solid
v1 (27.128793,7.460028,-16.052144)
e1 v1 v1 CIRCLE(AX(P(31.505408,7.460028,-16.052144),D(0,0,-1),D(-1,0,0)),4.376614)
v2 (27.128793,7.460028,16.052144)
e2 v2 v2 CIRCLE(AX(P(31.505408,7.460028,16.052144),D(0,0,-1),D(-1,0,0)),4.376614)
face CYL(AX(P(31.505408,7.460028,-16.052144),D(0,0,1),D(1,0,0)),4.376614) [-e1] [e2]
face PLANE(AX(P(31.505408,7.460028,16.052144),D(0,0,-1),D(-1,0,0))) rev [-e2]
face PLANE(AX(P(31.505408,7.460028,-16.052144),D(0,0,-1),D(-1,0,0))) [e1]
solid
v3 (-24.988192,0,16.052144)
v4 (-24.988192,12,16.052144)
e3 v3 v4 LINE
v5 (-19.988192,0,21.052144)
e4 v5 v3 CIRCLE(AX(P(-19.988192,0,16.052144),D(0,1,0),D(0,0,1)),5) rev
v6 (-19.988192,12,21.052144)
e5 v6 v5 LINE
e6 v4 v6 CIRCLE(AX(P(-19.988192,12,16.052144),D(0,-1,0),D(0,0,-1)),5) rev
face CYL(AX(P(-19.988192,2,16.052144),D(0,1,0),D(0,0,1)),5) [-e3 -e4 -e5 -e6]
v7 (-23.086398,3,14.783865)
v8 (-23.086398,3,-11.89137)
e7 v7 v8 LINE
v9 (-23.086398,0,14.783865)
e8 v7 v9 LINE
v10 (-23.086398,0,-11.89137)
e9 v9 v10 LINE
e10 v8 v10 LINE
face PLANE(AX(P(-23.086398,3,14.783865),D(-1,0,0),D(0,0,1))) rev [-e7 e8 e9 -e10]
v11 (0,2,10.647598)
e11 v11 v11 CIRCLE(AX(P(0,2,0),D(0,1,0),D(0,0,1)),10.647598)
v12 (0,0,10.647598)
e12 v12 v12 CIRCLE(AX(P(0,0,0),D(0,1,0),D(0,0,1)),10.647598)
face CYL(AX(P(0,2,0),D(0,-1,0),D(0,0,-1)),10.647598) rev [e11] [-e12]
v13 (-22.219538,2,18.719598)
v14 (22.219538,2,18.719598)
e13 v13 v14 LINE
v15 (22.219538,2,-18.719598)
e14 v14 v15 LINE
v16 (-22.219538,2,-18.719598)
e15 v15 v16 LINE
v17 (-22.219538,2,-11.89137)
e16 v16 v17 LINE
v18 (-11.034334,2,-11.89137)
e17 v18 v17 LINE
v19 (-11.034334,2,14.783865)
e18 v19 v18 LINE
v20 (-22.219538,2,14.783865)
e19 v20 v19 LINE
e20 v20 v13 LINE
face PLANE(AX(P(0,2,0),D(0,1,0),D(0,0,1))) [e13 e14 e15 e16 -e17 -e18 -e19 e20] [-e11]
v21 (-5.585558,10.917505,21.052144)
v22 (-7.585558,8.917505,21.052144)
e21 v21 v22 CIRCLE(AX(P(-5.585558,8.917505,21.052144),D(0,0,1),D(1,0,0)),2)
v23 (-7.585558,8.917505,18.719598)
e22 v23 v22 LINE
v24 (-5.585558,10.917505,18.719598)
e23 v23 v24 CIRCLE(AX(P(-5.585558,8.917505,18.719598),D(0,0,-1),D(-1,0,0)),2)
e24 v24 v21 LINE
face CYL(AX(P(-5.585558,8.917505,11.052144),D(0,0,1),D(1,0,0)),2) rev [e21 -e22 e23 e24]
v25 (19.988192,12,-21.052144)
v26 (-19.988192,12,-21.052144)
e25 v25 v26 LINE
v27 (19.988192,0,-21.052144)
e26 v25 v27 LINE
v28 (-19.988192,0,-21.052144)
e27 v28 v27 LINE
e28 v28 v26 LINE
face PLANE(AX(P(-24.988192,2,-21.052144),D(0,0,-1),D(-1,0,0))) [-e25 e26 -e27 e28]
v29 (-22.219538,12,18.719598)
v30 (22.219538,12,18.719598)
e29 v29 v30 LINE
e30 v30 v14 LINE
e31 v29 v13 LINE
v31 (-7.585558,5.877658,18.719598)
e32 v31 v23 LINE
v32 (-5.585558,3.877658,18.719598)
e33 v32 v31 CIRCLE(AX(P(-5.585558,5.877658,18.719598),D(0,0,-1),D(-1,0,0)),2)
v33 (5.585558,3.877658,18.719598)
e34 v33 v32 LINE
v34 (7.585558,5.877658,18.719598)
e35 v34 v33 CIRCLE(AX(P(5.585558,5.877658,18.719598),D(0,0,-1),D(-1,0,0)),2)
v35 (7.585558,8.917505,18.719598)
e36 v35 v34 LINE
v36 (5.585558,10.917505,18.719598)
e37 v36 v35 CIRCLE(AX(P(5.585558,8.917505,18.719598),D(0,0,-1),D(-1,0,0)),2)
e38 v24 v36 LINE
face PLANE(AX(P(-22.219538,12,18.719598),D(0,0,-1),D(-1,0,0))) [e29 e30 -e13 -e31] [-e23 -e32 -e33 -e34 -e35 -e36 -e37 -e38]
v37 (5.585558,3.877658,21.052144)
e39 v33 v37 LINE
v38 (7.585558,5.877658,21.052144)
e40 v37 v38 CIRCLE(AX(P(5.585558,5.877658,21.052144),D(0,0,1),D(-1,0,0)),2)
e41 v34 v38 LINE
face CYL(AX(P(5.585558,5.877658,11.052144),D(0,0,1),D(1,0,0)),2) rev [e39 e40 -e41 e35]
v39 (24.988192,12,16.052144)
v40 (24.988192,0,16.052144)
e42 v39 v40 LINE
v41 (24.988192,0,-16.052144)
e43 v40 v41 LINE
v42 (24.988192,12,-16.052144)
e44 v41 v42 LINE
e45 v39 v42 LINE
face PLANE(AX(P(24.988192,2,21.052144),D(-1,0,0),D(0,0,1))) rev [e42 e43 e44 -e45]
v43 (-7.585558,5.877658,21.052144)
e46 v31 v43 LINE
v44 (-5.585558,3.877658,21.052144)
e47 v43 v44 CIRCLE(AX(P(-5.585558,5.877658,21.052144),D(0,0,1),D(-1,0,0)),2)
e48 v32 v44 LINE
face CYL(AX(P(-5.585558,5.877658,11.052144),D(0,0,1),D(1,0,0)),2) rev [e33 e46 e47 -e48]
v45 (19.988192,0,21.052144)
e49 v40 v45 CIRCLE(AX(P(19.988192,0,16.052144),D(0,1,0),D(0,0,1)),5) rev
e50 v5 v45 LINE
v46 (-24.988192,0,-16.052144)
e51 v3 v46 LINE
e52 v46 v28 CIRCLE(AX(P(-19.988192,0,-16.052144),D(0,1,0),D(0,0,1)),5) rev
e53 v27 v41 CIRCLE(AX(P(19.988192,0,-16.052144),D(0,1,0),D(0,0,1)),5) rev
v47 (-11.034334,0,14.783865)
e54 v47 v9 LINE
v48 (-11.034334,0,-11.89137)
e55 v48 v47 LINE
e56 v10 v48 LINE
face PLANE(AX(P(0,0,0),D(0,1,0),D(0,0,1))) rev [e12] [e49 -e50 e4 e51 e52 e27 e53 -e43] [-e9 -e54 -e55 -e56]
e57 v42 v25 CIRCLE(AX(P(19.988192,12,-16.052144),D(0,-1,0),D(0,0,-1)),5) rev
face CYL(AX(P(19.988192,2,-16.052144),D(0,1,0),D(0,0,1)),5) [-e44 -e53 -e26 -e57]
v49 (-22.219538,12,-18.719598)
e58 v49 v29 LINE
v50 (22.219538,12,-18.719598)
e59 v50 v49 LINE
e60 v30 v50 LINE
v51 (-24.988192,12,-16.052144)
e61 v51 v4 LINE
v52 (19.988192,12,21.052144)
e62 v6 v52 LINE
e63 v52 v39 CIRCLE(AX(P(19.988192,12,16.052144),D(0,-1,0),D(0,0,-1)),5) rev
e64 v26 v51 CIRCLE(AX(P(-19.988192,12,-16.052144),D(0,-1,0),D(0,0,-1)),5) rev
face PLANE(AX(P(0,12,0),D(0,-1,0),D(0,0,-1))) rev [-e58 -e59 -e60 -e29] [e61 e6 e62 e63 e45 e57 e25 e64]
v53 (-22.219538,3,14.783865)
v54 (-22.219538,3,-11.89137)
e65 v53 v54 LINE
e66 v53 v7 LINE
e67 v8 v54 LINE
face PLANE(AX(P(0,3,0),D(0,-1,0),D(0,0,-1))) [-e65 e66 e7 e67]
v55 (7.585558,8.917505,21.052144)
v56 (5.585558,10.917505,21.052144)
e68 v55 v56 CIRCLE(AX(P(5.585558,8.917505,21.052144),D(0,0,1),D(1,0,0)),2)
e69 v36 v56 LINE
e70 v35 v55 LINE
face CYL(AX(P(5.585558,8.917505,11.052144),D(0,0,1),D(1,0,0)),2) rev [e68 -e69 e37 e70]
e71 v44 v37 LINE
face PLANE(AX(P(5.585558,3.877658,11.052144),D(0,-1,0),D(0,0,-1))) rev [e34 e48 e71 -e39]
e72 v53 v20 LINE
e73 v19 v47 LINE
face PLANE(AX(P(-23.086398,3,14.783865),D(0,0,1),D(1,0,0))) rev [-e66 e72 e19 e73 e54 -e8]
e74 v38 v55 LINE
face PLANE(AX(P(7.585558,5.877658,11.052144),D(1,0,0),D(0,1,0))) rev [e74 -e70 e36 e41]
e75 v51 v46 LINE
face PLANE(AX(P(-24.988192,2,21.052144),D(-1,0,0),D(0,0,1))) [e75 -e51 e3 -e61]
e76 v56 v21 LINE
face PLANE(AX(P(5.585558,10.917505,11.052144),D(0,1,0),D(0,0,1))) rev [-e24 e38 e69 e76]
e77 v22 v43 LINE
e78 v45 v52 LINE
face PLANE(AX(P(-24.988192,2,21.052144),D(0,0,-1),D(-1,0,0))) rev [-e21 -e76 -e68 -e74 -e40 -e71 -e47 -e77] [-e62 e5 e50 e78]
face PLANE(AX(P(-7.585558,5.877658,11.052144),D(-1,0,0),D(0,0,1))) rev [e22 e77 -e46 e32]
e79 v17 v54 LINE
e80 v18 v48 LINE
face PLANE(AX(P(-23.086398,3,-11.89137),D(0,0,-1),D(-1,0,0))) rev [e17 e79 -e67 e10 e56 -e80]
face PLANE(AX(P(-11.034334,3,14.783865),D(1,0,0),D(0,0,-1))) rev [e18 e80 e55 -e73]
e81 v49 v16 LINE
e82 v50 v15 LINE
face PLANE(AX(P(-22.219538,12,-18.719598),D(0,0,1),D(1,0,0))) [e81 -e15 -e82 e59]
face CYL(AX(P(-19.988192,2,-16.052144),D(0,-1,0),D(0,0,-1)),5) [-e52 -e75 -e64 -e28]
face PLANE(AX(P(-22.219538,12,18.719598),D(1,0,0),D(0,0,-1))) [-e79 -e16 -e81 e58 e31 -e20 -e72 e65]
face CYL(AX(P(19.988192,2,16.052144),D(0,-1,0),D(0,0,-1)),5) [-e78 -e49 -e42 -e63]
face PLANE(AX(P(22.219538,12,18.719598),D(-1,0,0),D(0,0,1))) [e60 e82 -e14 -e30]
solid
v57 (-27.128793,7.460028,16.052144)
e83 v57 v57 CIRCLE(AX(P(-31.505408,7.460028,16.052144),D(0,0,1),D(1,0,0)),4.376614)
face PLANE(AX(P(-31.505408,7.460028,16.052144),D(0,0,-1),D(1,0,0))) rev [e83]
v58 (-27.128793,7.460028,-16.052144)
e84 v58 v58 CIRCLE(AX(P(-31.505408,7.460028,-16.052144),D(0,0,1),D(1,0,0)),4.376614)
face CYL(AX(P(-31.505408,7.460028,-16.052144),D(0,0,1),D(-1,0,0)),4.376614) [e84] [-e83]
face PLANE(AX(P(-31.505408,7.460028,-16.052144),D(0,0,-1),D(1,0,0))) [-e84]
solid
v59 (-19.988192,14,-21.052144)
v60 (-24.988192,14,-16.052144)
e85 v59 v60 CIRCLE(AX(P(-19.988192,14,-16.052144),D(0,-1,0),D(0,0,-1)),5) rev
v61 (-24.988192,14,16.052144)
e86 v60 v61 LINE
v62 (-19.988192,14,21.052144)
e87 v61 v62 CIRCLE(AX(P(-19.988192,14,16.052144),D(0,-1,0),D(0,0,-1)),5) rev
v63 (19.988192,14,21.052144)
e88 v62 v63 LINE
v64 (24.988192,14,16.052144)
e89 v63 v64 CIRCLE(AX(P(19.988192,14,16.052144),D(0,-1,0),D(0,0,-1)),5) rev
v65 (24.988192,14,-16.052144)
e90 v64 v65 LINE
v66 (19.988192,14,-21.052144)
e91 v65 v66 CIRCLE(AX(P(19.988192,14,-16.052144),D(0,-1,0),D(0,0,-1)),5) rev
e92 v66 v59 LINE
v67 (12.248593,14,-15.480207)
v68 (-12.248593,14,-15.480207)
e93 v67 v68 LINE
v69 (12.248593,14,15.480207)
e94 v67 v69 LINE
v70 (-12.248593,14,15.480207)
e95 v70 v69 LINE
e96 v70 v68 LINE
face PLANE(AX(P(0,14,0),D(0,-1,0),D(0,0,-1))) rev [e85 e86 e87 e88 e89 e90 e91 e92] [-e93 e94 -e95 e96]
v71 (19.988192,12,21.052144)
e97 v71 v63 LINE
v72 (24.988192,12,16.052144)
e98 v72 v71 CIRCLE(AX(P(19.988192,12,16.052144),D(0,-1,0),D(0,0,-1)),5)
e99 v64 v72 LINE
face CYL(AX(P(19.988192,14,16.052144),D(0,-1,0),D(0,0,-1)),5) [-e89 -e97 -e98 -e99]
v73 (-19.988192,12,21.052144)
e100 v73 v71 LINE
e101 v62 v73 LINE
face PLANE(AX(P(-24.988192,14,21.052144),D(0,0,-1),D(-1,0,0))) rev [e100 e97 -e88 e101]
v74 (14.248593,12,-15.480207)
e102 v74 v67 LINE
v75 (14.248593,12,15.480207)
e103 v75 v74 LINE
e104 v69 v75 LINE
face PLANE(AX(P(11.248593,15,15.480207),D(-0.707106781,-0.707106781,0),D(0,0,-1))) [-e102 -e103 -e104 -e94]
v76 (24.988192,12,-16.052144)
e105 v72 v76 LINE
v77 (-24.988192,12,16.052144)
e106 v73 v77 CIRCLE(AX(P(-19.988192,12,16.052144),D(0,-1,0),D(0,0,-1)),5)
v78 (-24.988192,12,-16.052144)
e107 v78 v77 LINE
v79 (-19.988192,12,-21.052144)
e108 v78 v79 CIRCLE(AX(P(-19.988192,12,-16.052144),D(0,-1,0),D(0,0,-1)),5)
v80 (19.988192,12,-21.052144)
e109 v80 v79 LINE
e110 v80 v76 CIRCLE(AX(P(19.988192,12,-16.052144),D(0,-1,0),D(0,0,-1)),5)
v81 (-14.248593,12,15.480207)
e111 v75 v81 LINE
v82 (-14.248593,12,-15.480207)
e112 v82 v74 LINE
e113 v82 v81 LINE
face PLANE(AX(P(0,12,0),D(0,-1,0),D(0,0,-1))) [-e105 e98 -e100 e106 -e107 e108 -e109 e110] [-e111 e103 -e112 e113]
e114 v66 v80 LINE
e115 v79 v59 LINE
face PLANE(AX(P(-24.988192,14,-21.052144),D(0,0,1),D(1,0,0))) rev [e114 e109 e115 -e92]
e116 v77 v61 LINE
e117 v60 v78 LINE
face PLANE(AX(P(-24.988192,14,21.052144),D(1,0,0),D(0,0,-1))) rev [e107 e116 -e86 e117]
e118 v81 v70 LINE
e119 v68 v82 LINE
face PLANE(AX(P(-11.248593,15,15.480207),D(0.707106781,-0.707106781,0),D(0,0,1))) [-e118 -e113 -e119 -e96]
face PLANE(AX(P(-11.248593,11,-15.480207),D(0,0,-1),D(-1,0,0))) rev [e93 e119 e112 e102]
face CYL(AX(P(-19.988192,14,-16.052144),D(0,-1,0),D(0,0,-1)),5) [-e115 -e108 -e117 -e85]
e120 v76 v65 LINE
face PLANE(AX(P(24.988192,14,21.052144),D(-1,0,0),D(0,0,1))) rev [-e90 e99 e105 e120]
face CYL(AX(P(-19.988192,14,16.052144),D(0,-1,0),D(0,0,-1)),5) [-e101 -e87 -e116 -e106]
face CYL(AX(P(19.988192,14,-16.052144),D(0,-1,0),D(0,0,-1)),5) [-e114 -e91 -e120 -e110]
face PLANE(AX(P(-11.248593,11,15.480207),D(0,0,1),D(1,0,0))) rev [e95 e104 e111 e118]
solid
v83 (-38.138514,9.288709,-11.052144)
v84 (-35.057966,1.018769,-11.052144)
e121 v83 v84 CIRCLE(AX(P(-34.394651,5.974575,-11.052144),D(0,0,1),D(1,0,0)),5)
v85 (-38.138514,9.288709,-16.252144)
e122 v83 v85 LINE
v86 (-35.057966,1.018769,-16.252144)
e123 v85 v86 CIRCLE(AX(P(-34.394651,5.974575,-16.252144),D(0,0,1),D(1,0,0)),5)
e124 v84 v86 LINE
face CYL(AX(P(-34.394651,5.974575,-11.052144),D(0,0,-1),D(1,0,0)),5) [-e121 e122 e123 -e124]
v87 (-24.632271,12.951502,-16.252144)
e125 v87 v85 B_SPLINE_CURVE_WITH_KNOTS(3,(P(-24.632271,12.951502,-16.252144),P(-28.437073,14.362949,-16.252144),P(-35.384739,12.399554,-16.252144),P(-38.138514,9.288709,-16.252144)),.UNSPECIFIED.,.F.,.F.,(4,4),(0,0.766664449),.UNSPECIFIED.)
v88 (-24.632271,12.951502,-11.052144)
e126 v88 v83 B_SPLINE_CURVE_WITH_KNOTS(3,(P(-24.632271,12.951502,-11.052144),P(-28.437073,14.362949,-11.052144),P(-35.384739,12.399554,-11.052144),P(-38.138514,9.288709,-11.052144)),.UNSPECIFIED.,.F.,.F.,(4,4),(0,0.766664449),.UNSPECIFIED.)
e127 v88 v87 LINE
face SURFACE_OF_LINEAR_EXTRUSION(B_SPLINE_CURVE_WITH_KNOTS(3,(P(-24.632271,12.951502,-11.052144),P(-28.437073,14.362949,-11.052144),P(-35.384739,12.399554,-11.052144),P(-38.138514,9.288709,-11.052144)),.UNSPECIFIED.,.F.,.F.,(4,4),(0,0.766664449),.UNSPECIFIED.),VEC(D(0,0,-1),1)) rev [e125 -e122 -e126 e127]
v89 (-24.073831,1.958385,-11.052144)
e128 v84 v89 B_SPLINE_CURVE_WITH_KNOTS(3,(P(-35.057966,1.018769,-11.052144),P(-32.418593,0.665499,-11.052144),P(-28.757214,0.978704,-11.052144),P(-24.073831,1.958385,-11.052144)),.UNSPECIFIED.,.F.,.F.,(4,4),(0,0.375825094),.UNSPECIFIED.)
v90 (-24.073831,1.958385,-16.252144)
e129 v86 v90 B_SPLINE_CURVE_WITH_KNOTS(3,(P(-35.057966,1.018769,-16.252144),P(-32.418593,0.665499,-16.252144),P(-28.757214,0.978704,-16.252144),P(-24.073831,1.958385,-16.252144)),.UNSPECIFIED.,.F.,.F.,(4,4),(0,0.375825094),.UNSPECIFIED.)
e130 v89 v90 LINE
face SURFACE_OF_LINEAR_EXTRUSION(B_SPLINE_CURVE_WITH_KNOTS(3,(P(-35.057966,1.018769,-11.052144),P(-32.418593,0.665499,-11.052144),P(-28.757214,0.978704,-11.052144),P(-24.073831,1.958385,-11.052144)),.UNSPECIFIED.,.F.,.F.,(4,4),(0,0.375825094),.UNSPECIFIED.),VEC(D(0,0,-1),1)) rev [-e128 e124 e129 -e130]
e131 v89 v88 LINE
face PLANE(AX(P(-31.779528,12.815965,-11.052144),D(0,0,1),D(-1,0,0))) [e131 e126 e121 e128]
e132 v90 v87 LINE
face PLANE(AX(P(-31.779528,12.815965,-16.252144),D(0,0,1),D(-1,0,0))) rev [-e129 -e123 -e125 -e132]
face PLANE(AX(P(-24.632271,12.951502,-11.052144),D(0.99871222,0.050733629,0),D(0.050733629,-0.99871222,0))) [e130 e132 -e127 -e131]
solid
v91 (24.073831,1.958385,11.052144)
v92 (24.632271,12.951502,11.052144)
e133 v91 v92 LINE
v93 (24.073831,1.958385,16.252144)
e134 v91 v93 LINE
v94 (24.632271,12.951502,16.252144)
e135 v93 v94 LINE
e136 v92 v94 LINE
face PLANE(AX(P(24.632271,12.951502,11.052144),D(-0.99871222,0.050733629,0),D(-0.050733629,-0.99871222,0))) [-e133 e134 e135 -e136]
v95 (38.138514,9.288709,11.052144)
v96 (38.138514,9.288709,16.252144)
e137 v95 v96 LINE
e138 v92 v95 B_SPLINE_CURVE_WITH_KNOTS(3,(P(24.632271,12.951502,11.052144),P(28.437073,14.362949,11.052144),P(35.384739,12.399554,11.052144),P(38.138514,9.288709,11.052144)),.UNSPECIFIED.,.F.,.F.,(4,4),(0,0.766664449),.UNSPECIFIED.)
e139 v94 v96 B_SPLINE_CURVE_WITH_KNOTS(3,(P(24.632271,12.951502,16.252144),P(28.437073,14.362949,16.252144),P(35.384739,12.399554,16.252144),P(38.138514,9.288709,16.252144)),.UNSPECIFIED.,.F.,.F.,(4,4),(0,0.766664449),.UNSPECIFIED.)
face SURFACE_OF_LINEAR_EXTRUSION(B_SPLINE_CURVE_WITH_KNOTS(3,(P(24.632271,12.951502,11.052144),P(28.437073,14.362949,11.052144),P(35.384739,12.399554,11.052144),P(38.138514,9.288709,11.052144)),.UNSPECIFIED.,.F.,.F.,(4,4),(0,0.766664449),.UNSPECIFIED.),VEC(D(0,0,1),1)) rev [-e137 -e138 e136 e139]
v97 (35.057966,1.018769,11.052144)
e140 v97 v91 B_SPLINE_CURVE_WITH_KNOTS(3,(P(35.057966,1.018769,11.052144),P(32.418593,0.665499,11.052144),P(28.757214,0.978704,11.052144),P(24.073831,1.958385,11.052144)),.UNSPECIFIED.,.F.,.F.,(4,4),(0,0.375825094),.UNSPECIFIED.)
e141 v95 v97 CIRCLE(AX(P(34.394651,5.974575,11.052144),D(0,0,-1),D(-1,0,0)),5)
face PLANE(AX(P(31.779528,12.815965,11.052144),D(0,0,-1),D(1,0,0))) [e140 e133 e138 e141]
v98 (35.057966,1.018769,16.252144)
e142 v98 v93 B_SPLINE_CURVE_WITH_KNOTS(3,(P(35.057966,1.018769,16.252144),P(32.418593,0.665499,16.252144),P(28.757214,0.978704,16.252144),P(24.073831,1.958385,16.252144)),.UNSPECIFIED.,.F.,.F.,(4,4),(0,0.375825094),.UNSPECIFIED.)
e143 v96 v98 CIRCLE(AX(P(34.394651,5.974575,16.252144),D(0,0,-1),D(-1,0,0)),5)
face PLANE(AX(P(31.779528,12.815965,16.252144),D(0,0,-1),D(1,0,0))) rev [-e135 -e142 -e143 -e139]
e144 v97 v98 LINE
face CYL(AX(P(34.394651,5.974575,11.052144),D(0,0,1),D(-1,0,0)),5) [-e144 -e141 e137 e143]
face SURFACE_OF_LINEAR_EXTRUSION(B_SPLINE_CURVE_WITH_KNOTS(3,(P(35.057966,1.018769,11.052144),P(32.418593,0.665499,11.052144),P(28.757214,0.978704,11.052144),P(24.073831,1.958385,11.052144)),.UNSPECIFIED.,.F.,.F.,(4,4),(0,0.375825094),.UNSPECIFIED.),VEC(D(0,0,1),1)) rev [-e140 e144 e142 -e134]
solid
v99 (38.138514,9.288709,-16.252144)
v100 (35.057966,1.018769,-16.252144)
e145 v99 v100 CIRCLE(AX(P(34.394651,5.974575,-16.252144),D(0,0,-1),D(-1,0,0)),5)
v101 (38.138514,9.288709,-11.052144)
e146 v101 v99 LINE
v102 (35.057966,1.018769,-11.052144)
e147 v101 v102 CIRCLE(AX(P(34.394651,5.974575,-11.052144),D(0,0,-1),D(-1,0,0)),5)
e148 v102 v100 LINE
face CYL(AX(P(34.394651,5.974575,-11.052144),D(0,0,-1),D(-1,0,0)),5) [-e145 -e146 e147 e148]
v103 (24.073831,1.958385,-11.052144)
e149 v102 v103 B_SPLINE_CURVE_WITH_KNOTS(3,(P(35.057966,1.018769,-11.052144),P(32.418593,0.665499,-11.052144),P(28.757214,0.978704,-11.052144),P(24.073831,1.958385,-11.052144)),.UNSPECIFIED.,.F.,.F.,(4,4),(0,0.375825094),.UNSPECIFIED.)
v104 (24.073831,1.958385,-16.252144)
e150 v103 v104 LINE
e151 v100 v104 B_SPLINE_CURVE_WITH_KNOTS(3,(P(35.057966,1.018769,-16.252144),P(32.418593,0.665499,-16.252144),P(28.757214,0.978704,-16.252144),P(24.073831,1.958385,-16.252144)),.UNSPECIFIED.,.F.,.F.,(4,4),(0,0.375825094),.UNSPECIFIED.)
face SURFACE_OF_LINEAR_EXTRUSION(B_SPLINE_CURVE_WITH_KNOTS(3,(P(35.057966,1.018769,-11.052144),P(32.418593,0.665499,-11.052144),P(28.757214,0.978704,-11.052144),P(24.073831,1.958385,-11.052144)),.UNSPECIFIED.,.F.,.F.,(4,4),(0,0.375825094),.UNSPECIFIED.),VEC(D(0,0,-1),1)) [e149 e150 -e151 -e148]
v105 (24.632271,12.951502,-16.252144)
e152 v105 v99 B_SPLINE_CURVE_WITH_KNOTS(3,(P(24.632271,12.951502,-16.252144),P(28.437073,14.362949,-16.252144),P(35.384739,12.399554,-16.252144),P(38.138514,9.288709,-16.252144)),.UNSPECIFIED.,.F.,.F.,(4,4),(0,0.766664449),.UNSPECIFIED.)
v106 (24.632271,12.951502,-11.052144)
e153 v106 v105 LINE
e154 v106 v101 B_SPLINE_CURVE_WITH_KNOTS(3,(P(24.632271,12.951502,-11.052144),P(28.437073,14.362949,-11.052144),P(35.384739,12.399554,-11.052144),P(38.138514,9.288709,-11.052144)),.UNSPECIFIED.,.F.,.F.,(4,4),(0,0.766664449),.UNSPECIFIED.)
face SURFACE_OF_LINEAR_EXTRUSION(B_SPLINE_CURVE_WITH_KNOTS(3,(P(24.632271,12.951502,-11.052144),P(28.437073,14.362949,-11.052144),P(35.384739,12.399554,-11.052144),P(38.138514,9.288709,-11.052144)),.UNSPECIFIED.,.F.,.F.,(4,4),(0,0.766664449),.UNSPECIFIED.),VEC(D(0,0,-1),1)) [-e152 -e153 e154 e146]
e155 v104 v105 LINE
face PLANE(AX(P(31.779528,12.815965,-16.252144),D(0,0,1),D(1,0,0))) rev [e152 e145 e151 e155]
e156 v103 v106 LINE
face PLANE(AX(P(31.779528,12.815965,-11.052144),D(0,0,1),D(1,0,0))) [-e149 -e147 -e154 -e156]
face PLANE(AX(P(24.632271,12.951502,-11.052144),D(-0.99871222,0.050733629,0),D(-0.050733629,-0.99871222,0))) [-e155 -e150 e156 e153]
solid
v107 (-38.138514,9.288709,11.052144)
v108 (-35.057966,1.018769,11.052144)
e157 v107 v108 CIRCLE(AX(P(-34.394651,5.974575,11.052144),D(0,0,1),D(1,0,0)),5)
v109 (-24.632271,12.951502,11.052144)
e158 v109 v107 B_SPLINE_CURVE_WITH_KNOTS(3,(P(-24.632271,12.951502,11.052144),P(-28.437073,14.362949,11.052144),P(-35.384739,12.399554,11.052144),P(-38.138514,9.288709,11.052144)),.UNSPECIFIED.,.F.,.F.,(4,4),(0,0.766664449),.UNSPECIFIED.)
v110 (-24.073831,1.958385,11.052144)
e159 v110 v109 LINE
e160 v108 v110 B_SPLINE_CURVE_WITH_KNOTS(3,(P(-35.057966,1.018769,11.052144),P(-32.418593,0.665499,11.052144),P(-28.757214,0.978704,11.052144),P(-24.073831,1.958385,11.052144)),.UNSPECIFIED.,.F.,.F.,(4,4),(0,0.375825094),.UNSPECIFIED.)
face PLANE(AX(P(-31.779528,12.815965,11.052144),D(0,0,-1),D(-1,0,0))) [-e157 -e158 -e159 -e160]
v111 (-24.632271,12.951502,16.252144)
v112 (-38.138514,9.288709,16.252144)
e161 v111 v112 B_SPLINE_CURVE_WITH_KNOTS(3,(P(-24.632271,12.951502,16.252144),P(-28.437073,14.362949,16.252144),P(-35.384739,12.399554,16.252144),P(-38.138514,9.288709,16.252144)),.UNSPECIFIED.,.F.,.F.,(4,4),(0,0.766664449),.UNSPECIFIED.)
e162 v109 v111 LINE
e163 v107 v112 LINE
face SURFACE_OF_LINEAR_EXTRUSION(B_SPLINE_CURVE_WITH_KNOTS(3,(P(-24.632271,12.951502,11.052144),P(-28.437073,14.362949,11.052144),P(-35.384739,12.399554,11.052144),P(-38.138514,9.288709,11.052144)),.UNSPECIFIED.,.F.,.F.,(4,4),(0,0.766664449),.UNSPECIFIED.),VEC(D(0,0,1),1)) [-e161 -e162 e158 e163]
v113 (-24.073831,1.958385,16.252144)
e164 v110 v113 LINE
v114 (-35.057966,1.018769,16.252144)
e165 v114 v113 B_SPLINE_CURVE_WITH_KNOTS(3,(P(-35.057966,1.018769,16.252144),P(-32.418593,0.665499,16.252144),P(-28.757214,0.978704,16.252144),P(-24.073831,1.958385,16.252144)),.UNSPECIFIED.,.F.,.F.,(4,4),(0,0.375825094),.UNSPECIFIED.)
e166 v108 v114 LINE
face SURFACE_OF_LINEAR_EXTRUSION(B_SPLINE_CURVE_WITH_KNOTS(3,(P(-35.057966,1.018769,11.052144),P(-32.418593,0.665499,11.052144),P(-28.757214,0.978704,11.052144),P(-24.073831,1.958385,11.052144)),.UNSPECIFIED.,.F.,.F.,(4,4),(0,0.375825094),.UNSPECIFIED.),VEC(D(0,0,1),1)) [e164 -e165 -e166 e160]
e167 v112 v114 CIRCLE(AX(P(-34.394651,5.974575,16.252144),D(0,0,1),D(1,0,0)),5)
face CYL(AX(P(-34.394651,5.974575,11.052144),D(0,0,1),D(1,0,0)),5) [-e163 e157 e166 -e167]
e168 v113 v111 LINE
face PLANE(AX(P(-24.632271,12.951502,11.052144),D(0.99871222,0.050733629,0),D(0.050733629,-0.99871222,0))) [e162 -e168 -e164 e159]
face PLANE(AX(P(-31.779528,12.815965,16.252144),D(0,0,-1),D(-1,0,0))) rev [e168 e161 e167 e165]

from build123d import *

# Parameters (mm, degrees)
SKETCH1_W                = 49.976384144
SKETCH1_H                = 42.104287242
SKETCH1_R                = 10.647598488
BOSS_EXTRUDE2_DEPTH      = 2
SKETCH2_W                = 49.976384144
SKETCH2_H                = 42.104287242
SKETCH2_W_2              = 44.439076198
SKETCH2_H_2              = 37.439195754
BOSS_EXTRUDE3_DEPTH      = 10
CUT_EXTRUDE1_DEPTH       = 10
SKETCH4_W                = 49.976384144
SKETCH4_H                = 42.104287242
BOSS_EXTRUDE4_DEPTH      = 2
SKETCH5_W                = 22.497186092
SKETCH5_H                = 30.96041324
CUT_EXTRUDE2_DEPTH       = 3
SKETCH6_W                = 12.052063978
SKETCH6_H                = 26.675234937
CUT_EXTRUDE3_DEPTH       = 3
FILLET3_R                = 5
FILLET4_R                = 5
FILLET5_R                = 5
FILLET6_R                = 5
CHAMFER1_SIZE            = 3
BOSS_EXTRUDE5_DEPTH      = 16.052144
BOSS_EXTRUDE5_DEPTH_BACK = 16.052144
SKETCH7_R                = 4.376614107
BOSS_EXTRUDE7_DEPTH      = 0.2
BOSS_EXTRUDE7_DEPTH_BACK = 5


with BuildPart() as part:
    # Sketch1 → Boss-Extrude2 (new body)
    with BuildSketch(Plane(origin=(0, 0, 0), x_dir=(1, 0, 0), z_dir=(0, 1, 0))):
        Rectangle(SKETCH1_W, SKETCH1_H)
        with Locations(Location((0, 0, 0), (0, 0, 270))):
            Circle(SKETCH1_R, mode=Mode.SUBTRACT)
    extrude(amount=BOSS_EXTRUDE2_DEPTH)

    # Sketch2 → Boss-Extrude3 (add)
    with BuildSketch(Plane(origin=(0, 2, 0), x_dir=(1, 0, 0), z_dir=(0, 1, 0))):
        Rectangle(SKETCH2_W, SKETCH2_H)
        Rectangle(SKETCH2_W_2, SKETCH2_H_2, mode=Mode.SUBTRACT)
    extrude(amount=BOSS_EXTRUDE3_DEPTH)

    # Sketch3 → Cut-Extrude1 (cut)
    with BuildSketch(Plane.XY.offset(21.052143621)):
        with BuildLine():
            Line((-7.585558373, 5.87765836), (-7.585558373, 8.917504734))
            ThreePointArc((-7.585558373, 8.917504734), (-6.999771935, 10.331718297), (-5.585558373, 10.917504734))
            Line((-5.585558373, 10.917504734), (5.585558373, 10.917504734))
            ThreePointArc((5.585558373, 10.917504734), (6.999771935, 10.331718297), (7.585558373, 8.917504734))
            Line((7.585558373, 8.917504734), (7.585558373, 5.87765836))
            ThreePointArc((7.585558373, 5.87765836), (6.999771935, 4.463444798), (5.585558373, 3.87765836))
            Line((5.585558373, 3.87765836), (-5.585558373, 3.87765836))
            ThreePointArc((-5.585558373, 3.87765836), (-6.999771935, 4.463444798), (-7.585558373, 5.87765836))
        make_face()
    extrude(amount=-CUT_EXTRUDE1_DEPTH, mode=Mode.SUBTRACT)

    # Sketch6 → Cut-Extrude3 (cut)
    with BuildSketch(Plane.XZ):
        with Locations((-17.06036612, 1.446247677)):
            Rectangle(SKETCH6_W, SKETCH6_H)
    extrude(amount=-CUT_EXTRUDE3_DEPTH, mode=Mode.SUBTRACT)

    # Fillet3
    fillet3_edges = [part.edges().sort_by_distance(p)[0] for p in [
        (-24.988192072, 6, 21.052143621),
    ]]
    fillet(fillet3_edges, radius=FILLET3_R)

    # Fillet5
    fillet5_edges = [part.edges().sort_by_distance(p)[0] for p in [
        (-24.988192072, 6, -21.052143621),
        (24.988192072, 6, 21.052143621),
        (24.988192072, 6, -21.052143621),
    ]]
    fillet(fillet5_edges, radius=FILLET5_R)


with BuildPart() as body_2:
    # Sketch4 → Boss-Extrude4 (new body)
    with BuildSketch(Plane(origin=(0, 12, 0), x_dir=(1, 0, 0), z_dir=(0, 1, 0))):
        Rectangle(SKETCH4_W, SKETCH4_H)
    extrude(amount=BOSS_EXTRUDE4_DEPTH)

    # Sketch5 → Cut-Extrude2 (cut)
    with BuildSketch(Plane(origin=(0, 14, 0), x_dir=(1, 0, 0), z_dir=(0, 1, 0))):
        Rectangle(SKETCH5_W, SKETCH5_H)
    extrude(amount=-CUT_EXTRUDE2_DEPTH, mode=Mode.SUBTRACT)

    # Fillet4
    fillet4_edges = [body_2.edges().sort_by_distance(p)[0] for p in [
        (-24.988192072, 13, 21.052143621),
        (-24.988192072, 13, -21.052143621),
    ]]
    fillet(fillet4_edges, radius=FILLET4_R)

    # Fillet6
    fillet6_edges = [body_2.edges().sort_by_distance(p)[0] for p in [
        (24.988192072, 13, 21.052143621),
        (24.988192072, 13, -21.052143621),
    ]]
    fillet(fillet6_edges, radius=FILLET6_R)

    # Chamfer1
    # the kernel refuses this chamfer: 3 mm, written as the material it takes off along each edge
    with BuildSketch(Plane(origin=(-11.248593046, 12, -15.48020662), x_dir=(-0.9996219169112969, -0.02749587661058621, 0), z_dir=(0, 0, 1)), Plane(origin=(11.248593046, 12, 15.48020662), x_dir=(0.9996219169112969, -0.02749587661058621, 0), z_dir=(0, 0, -1))) as chamfer1_piece_1:
        Polygon((CHAMFER1_SIZE * 0.999621916911, -CHAMFER1_SIZE * 0.0274958766106), (-CHAMFER1_SIZE * 0.0274958766106, -CHAMFER1_SIZE * 0.999621916911), (0, 0), align=None)
    extrude(amount=30.960413241, mode=Mode.SUBTRACT)


with BuildPart() as body_3:
    # Sketch7 → Boss-Extrude5 (new, two sides: drawn at the far end of the back side and taken through both)
    with BuildSketch(Plane(origin=(0, 0, 0), x_dir=(-1, 0, 0), z_dir=(0, 0, -1)).offset(-BOSS_EXTRUDE5_DEPTH_BACK)):
        with Locations((-31.505407588, 7.46002795)):
            Circle(SKETCH7_R)
    extrude(amount=BOSS_EXTRUDE5_DEPTH + BOSS_EXTRUDE5_DEPTH_BACK)


with BuildPart() as body_4:
    # Mirror1: mirrored copy
    add(body_3.part.mirror(Plane(origin=(0, 0, 0), x_dir=(0, 0, 1), z_dir=(1, 0, 0))))


with BuildPart() as body_5:
    # Sketch8 → Boss-Extrude7 (new, two sides: drawn at the far end of the back side and taken through both)
    with BuildSketch(Plane(origin=(0, 0, -16.052143621), x_dir=(-1, 0, 0), z_dir=(0, 0, -1)).offset(-BOSS_EXTRUDE7_DEPTH_BACK)):
        with BuildLine():
            Line((-24.632270624, 12.951501751), (-24.073830772, 1.958385001))
            add(Edge.make_bspline(
                [(-24.073830772, 1.958385001), (-28.757214086, 0.978704203), (-32.41859253, 0.665498797), (-35.057966104, 1.018768784)],
                knots=[0, 0, 0, 0, 0.375825094, 0.375825094, 0.375825094, 0.375825094], degree=3))
            ThreePointArc((-35.057966104, 1.018768784), (-39.080137155, 4.229233655), (-38.138514088, 9.288708989))
            add(Edge.make_bspline(
                [(-24.632270624, 12.951501751), (-28.43707339, 14.362948841), (-35.384738996, 12.399554019), (-38.138514088, 9.288708989)],
                knots=[0, 0, 0, 0, 0.766664449, 0.766664449, 0.766664449, 0.766664449], degree=3))
        make_face()
    extrude(amount=BOSS_EXTRUDE7_DEPTH + BOSS_EXTRUDE7_DEPTH_BACK)


with BuildPart() as body_6:
    # Mirror3: mirrored copy
    add(body_5.part.mirror(Plane(origin=(0, 0, 0), x_dir=(1, 0, 0), z_dir=(0, 0, -1))))


with BuildPart() as body_7:
    # Mirror4: mirrored copy
    add(body_5.part.mirror(Plane(origin=(0, 0, 0), x_dir=(0, 0, 1), z_dir=(1, 0, 0))))


with BuildPart() as body_8:
    # Mirror4 2: mirrored copy
    add(body_6.part.mirror(Plane(origin=(0, 0, 0), x_dir=(0, 0, 1), z_dir=(1, 0, 0))))


solid = Compound([part.part, body_2.part, body_3.part, body_4.part, body_5.part, body_6.part, body_7.part, body_8.part])
